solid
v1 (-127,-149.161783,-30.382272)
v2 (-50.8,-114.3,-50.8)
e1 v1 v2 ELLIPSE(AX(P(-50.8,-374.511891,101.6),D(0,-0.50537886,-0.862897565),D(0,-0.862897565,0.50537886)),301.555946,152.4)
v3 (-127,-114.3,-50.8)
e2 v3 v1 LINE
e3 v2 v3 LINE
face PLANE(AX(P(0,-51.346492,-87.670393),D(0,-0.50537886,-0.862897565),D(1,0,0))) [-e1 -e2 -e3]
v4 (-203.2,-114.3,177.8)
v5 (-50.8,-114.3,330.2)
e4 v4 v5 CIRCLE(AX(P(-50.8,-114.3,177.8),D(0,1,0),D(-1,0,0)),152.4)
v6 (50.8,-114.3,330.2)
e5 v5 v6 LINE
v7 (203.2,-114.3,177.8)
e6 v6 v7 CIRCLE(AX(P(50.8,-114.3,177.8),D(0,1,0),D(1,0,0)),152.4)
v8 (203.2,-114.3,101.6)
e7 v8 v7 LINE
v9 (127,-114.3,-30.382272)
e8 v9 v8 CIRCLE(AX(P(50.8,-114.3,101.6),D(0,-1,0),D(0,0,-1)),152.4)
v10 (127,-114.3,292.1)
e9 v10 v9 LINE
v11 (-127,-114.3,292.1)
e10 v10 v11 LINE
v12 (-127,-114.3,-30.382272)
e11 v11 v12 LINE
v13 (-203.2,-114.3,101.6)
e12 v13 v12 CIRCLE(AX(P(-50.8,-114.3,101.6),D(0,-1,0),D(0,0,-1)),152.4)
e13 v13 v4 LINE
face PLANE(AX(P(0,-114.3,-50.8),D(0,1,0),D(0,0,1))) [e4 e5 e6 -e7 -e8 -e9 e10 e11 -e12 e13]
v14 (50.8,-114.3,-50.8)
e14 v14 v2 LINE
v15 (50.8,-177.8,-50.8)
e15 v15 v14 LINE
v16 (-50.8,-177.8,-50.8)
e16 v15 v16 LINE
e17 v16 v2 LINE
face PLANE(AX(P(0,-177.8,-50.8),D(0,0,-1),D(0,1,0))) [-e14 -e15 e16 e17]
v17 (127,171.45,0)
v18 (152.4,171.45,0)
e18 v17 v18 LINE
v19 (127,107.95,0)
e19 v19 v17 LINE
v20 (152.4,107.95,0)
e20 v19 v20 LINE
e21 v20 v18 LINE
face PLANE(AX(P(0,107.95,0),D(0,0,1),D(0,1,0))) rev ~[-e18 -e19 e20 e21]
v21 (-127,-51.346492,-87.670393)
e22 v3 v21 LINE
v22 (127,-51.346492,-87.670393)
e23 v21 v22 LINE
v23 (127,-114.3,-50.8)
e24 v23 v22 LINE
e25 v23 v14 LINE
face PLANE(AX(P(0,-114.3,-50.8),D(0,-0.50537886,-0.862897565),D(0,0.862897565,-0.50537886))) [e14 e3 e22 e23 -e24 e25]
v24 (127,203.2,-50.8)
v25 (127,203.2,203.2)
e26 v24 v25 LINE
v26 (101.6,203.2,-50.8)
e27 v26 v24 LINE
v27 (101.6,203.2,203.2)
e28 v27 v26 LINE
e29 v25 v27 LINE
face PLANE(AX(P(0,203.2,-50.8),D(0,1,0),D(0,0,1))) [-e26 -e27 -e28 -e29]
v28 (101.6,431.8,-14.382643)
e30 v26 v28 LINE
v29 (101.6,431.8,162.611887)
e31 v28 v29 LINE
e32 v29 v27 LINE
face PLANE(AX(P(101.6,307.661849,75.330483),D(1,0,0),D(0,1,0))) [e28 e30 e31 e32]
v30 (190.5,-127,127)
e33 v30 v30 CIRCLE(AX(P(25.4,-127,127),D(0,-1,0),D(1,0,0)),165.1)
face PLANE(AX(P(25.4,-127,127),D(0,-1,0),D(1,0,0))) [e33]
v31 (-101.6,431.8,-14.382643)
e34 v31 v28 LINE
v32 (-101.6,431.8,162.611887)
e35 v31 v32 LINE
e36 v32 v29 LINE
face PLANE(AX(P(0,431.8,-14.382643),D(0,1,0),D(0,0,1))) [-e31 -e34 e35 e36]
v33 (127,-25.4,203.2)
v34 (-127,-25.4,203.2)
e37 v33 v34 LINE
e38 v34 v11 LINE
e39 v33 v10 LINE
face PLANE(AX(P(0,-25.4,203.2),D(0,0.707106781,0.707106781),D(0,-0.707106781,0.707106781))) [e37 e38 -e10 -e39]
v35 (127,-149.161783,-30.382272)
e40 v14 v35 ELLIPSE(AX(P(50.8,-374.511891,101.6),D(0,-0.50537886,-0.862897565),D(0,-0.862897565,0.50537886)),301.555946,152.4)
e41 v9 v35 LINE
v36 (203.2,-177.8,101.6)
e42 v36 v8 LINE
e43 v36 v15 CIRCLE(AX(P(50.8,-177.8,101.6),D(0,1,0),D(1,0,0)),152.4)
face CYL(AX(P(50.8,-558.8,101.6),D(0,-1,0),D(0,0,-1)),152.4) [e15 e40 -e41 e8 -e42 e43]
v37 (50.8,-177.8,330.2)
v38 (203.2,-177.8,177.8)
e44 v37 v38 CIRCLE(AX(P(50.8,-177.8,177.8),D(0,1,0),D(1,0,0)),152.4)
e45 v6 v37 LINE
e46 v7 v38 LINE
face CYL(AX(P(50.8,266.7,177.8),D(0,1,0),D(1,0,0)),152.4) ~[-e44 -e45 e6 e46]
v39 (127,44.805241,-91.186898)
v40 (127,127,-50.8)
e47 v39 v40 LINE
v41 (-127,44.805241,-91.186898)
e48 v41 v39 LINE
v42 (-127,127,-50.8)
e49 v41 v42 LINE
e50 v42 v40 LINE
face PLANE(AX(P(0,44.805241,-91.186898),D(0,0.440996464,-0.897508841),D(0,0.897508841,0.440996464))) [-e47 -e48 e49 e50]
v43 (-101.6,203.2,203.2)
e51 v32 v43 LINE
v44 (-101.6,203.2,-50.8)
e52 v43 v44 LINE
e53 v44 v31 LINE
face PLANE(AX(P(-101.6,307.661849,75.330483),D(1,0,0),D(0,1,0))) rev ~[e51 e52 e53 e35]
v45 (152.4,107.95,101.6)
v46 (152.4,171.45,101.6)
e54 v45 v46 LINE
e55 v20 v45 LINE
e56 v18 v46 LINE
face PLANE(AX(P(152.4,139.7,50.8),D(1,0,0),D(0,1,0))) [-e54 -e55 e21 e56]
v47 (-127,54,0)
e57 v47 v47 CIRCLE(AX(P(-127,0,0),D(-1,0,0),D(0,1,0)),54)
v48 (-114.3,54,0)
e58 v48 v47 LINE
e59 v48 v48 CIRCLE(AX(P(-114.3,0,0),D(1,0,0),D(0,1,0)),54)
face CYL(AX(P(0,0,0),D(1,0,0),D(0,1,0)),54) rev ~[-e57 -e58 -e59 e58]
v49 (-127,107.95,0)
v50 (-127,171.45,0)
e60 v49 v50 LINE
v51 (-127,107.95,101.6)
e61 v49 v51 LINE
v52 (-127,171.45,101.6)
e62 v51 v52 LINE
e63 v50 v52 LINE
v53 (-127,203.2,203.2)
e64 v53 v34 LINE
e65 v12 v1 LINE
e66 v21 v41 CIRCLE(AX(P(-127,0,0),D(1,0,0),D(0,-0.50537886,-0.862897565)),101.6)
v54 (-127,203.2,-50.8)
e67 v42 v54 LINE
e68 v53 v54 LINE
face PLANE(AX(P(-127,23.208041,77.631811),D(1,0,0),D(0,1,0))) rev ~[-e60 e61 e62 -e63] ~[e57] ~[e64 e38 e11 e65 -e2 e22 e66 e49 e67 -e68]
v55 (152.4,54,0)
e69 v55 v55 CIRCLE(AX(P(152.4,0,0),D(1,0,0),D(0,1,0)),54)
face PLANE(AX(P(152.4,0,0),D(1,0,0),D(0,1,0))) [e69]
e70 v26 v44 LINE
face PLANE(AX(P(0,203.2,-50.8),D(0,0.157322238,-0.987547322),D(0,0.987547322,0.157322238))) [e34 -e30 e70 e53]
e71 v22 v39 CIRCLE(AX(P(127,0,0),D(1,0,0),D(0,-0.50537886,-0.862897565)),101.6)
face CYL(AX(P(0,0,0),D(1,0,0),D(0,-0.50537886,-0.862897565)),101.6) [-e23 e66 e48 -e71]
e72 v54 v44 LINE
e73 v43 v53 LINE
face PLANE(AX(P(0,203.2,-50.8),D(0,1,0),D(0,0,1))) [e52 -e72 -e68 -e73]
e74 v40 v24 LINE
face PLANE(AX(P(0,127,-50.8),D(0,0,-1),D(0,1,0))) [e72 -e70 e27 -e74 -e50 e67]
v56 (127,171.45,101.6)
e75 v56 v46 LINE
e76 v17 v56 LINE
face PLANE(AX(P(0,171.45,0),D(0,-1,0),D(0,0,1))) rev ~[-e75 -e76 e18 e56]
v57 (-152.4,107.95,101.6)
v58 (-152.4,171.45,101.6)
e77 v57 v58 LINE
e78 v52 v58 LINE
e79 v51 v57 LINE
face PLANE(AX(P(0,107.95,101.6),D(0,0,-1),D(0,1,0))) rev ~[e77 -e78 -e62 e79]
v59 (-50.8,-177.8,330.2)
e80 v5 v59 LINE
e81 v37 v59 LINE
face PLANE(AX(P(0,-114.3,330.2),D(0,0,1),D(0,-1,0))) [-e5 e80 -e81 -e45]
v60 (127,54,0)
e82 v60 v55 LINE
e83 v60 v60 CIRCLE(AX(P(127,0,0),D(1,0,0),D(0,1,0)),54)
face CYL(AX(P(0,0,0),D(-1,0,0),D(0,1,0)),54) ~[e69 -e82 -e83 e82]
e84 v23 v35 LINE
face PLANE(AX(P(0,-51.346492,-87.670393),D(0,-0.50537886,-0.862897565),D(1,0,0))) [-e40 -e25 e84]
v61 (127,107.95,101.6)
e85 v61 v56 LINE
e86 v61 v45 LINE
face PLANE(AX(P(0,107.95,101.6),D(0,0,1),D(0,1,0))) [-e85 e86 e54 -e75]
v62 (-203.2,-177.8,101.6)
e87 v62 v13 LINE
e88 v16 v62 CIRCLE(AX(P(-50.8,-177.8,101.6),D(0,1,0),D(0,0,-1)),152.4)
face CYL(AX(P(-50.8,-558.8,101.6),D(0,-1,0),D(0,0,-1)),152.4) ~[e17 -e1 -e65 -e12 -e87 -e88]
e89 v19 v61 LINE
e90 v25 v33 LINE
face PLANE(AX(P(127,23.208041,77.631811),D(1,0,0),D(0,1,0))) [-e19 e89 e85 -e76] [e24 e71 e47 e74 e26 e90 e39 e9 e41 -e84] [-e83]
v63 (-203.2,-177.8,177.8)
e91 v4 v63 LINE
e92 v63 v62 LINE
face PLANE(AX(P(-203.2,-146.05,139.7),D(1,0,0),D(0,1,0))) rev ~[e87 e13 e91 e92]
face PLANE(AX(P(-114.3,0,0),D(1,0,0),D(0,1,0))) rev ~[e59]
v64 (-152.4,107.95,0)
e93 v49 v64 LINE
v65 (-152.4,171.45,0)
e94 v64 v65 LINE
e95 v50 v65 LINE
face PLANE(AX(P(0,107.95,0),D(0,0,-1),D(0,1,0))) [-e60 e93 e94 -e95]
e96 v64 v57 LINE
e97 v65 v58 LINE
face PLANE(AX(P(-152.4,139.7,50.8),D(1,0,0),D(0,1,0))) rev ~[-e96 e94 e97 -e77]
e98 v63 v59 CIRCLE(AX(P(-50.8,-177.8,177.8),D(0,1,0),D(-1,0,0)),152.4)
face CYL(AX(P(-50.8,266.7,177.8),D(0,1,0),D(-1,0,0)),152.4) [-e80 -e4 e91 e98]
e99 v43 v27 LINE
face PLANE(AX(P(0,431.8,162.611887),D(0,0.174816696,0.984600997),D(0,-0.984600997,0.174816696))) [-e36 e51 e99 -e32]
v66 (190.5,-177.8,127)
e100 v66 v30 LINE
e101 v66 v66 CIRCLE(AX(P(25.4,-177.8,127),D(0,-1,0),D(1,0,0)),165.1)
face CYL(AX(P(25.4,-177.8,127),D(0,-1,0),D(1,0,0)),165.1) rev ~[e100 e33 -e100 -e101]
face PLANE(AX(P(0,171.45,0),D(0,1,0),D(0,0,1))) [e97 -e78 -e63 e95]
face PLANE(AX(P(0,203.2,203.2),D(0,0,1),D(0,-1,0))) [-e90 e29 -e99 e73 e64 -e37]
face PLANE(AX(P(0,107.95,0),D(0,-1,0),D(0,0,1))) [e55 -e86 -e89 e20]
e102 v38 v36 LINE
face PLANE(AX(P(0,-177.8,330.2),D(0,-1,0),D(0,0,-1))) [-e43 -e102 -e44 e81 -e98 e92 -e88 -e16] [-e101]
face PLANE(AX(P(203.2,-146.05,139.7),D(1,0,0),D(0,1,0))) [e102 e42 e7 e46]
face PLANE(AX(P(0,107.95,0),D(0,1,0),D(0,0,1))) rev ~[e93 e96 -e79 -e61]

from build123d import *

# Parameters (mm, degrees)
F1_DEPTH      = 203.2
F1_DEPTH_BACK = 203.2
F0_W          = 63.5
F0_H          = 101.6
F0_R          = 54
F2_DEPTH      = 127
F2_DEPTH_BACK = 127
F3_DEPTH      = 101.6
F3_DEPTH_BACK = 101.6
F4_DEPTH      = 152.4
F4_DEPTH_BACK = 114.3
F5_T1_DEPTH   = 825.5
F5_T6_DEPTH   = 825.5
F5_T11_DEPTH  = 444.5
F5_T16_DEPTH  = 825.5
F5_T21_DEPTH  = 825.5
F6_DEPTH      = 152.4
F6_DEPTH_BACK = 152.4
F7_R          = 165.1
F8_DEPTH      = 50.8


# Not quite as in the source:
# - a fillet or chamfer that OpenCascade refuses, or shapes differently, is made with other operations: its cross-section is extruded or revolved along the edge and cut away or added


with BuildPart() as f1:
    # F0 (on Right) → F1 (new body, two sides)
    with BuildSketch(Plane.YZ) as f1_sk:
        Polygon((-177.8, -50.8), (-114.3, -50.8), (-114.3, 292.1), (-114.3, 330.2), (-177.8, 330.2), align=None)
    extrude(amount=F1_DEPTH)
    extrude(f1_sk.sketch, amount=-F1_DEPTH_BACK)

    # F0 (on Right) → F2 (join, two sides)
    with BuildSketch(Plane.YZ) as f2_sk:
        with BuildLine():
            ThreePointArc((-51.3464921696, -87.6703926185), (-50.5260150594, 88.1457985511), (101.6, 0))
            ThreePointArc((101.6, 0), (86.2402819365, -53.7138136006), (44.8052407181, -91.1868982047))
            Line((44.8052407181, -91.1868982047), (127, -50.8))
            Line((127, -50.8), (203.2, -50.8))
            Line((203.2, -50.8), (203.2, 203.2))
            Line((203.2, 203.2), (-25.4, 203.2))
            Line((-25.4, 203.2), (-114.3, 292.1))
            Line((-114.3, 292.1), (-114.3, -50.8))
            Line((-114.3, -50.8), (-51.3464921696, -87.6703926185))
        make_face()
        with Locations((139.7, 50.8)):
            Rectangle(F0_W, F0_H, mode=Mode.SUBTRACT)
        with BuildLine():
            ThreePointArc((44.8052407181, -91.1868982047), (86.2402819365, -53.7138136006), (101.6, 0))
            ThreePointArc((101.6, 0), (-50.5260150594, 88.1457985511), (-51.3464921696, -87.6703926185))
            ThreePointArc((-51.3464921696, -87.6703926185), (-3.7132796181, -101.5321208016), (44.8052407181, -91.1868982047))
        make_face()
        Circle(F0_R, mode=Mode.SUBTRACT)
    extrude(amount=F2_DEPTH)
    extrude(f2_sk.sketch, amount=-F2_DEPTH_BACK)

    # F0 (on Right) → F3 (join, two sides)
    with BuildSketch(Plane.YZ) as f3_sk:
        Polygon((203.2, 203.2), (203.2, -50.8), (431.8, -14.3826426938), (431.8, 162.6118868589), align=None)
    extrude(amount=F3_DEPTH)
    extrude(f3_sk.sketch, amount=-F3_DEPTH_BACK)

    # F0 (on Right) → F4 (join, two sides)
    with BuildSketch(Plane.YZ) as f4_sk:
        Circle(F0_R)
    extrude(amount=F4_DEPTH)
    extrude(f4_sk.sketch, amount=-F4_DEPTH_BACK)

    # F5: fillet of radius 152.4 on 4 edges, made by hand

    # F5_s2 → F5_t1 (cut)
    with BuildSketch(Plane.XZ.offset(-266.7)):
        with BuildLine():
            ThreePointArc((203.2, 177.8), (158.5630734528, 285.5630734528), (50.8, 330.2))
            Line((50.8, 330.2), (203.2, 330.2))
            Line((203.2, 330.2), (203.2, 177.8))
        make_face()
        with BuildLine():
            ThreePointArc((-203.2, 177.8), (-158.5630734528, 285.5630734528), (-50.8, 330.2))
            Line((-50.8, 330.2), (-203.2, 330.2))
            Line((-203.2, 330.2), (-203.2, 177.8))
        make_face()
    extrude(amount=F5_T1_DEPTH, mode=Mode.SUBTRACT)


with BuildPart() as f5_tool4:
    # F5_s5 → F5_t6 (new body)
    with BuildSketch(Plane.XZ.offset(558.8)):
        with BuildLine():
            ThreePointArc((50.8, -50.8), (158.5630734528, -6.1630734528), (203.2, 101.6))
            Line((203.2, 101.6), (203.2, -50.8))
            Line((203.2, -50.8), (50.8, -50.8))
        make_face()
    extrude(amount=-F5_T6_DEPTH)

    split(bisect_by=Plane(origin=(0, -51.3464921696, -87.6703926185), x_dir=(1, 0, 0), z_dir=(0, -0.5053788599, -0.8628975651)), keep=Keep.TOP)


with BuildPart() as f1_1:
    add(f1.part)

    # F5_t3: cut F5_tool4
    add(f5_tool4.part, mode=Mode.SUBTRACT)


with BuildPart() as f5_tool9:
    # F5_s10 → F5_t11 (new body)
    with BuildSketch(Plane.XZ.offset(558.8)):
        with BuildLine():
            ThreePointArc((50.8, -50.8), (158.5630734528, -6.1630734528), (203.2, 101.6))
            Line((203.2, 101.6), (203.2, -50.8))
            Line((203.2, -50.8), (50.8, -50.8))
        make_face()
    extrude(amount=-F5_T11_DEPTH)

    split(bisect_by=Plane.YZ.offset(127), keep=Keep.TOP)


with BuildPart() as f1_2:
    add(f1_1.part)

    # F5_t8: cut F5_tool9
    add(f5_tool9.part, mode=Mode.SUBTRACT)


with BuildPart() as f5_tool14:
    # F5_s15 → F5_t16 (new body)
    with BuildSketch(Plane.XZ.offset(558.8)):
        with BuildLine():
            ThreePointArc((-50.8, -50.8), (-158.5630734528, -6.1630734528), (-203.2, 101.6))
            Line((-203.2, 101.6), (-203.2, -50.8))
            Line((-203.2, -50.8), (-50.8, -50.8))
        make_face()
    extrude(amount=-F5_T16_DEPTH)

    split(bisect_by=Plane(origin=(0, -51.3464921696, -87.6703926185), x_dir=(1, 0, 0), z_dir=(0, -0.5053788599, -0.8628975651)), keep=Keep.TOP)


with BuildPart() as f1_3:
    add(f1_2.part)

    # F5_t13: cut F5_tool14
    add(f5_tool14.part, mode=Mode.SUBTRACT)


with BuildPart() as f5_tool19:
    # F5_s20 → F5_t21 (new body)
    with BuildSketch(Plane.XZ.offset(558.8)):
        with BuildLine():
            ThreePointArc((-50.8, -50.8), (-158.5630734528, -6.1630734528), (-203.2, 101.6))
            Line((-203.2, 101.6), (-203.2, -50.8))
            Line((-203.2, -50.8), (-50.8, -50.8))
        make_face()
    extrude(amount=-F5_T21_DEPTH)

    split(bisect_by=Plane.YZ.offset(-127), keep=Keep.BOTTOM)


with BuildPart() as f1_4:
    add(f1_3.part)

    # F5_t18: cut F5_tool19
    add(f5_tool19.part, mode=Mode.SUBTRACT)

    # F0 (on Right) → F6 (join, two sides)
    with BuildSketch(Plane.YZ) as f6_sk:
        with Locations((139.7, 50.8)):
            Rectangle(F0_W, F0_H)
    extrude(amount=F6_DEPTH)
    extrude(f6_sk.sketch, amount=-F6_DEPTH_BACK)

    # F7 (on face) → F8 (cut)
    with BuildSketch(Plane.XZ.offset(177.8)):
        with Locations((25.4, 127)):
            Circle(F7_R)
    extrude(amount=-F8_DEPTH, mode=Mode.SUBTRACT)


solid = f1_4.part
